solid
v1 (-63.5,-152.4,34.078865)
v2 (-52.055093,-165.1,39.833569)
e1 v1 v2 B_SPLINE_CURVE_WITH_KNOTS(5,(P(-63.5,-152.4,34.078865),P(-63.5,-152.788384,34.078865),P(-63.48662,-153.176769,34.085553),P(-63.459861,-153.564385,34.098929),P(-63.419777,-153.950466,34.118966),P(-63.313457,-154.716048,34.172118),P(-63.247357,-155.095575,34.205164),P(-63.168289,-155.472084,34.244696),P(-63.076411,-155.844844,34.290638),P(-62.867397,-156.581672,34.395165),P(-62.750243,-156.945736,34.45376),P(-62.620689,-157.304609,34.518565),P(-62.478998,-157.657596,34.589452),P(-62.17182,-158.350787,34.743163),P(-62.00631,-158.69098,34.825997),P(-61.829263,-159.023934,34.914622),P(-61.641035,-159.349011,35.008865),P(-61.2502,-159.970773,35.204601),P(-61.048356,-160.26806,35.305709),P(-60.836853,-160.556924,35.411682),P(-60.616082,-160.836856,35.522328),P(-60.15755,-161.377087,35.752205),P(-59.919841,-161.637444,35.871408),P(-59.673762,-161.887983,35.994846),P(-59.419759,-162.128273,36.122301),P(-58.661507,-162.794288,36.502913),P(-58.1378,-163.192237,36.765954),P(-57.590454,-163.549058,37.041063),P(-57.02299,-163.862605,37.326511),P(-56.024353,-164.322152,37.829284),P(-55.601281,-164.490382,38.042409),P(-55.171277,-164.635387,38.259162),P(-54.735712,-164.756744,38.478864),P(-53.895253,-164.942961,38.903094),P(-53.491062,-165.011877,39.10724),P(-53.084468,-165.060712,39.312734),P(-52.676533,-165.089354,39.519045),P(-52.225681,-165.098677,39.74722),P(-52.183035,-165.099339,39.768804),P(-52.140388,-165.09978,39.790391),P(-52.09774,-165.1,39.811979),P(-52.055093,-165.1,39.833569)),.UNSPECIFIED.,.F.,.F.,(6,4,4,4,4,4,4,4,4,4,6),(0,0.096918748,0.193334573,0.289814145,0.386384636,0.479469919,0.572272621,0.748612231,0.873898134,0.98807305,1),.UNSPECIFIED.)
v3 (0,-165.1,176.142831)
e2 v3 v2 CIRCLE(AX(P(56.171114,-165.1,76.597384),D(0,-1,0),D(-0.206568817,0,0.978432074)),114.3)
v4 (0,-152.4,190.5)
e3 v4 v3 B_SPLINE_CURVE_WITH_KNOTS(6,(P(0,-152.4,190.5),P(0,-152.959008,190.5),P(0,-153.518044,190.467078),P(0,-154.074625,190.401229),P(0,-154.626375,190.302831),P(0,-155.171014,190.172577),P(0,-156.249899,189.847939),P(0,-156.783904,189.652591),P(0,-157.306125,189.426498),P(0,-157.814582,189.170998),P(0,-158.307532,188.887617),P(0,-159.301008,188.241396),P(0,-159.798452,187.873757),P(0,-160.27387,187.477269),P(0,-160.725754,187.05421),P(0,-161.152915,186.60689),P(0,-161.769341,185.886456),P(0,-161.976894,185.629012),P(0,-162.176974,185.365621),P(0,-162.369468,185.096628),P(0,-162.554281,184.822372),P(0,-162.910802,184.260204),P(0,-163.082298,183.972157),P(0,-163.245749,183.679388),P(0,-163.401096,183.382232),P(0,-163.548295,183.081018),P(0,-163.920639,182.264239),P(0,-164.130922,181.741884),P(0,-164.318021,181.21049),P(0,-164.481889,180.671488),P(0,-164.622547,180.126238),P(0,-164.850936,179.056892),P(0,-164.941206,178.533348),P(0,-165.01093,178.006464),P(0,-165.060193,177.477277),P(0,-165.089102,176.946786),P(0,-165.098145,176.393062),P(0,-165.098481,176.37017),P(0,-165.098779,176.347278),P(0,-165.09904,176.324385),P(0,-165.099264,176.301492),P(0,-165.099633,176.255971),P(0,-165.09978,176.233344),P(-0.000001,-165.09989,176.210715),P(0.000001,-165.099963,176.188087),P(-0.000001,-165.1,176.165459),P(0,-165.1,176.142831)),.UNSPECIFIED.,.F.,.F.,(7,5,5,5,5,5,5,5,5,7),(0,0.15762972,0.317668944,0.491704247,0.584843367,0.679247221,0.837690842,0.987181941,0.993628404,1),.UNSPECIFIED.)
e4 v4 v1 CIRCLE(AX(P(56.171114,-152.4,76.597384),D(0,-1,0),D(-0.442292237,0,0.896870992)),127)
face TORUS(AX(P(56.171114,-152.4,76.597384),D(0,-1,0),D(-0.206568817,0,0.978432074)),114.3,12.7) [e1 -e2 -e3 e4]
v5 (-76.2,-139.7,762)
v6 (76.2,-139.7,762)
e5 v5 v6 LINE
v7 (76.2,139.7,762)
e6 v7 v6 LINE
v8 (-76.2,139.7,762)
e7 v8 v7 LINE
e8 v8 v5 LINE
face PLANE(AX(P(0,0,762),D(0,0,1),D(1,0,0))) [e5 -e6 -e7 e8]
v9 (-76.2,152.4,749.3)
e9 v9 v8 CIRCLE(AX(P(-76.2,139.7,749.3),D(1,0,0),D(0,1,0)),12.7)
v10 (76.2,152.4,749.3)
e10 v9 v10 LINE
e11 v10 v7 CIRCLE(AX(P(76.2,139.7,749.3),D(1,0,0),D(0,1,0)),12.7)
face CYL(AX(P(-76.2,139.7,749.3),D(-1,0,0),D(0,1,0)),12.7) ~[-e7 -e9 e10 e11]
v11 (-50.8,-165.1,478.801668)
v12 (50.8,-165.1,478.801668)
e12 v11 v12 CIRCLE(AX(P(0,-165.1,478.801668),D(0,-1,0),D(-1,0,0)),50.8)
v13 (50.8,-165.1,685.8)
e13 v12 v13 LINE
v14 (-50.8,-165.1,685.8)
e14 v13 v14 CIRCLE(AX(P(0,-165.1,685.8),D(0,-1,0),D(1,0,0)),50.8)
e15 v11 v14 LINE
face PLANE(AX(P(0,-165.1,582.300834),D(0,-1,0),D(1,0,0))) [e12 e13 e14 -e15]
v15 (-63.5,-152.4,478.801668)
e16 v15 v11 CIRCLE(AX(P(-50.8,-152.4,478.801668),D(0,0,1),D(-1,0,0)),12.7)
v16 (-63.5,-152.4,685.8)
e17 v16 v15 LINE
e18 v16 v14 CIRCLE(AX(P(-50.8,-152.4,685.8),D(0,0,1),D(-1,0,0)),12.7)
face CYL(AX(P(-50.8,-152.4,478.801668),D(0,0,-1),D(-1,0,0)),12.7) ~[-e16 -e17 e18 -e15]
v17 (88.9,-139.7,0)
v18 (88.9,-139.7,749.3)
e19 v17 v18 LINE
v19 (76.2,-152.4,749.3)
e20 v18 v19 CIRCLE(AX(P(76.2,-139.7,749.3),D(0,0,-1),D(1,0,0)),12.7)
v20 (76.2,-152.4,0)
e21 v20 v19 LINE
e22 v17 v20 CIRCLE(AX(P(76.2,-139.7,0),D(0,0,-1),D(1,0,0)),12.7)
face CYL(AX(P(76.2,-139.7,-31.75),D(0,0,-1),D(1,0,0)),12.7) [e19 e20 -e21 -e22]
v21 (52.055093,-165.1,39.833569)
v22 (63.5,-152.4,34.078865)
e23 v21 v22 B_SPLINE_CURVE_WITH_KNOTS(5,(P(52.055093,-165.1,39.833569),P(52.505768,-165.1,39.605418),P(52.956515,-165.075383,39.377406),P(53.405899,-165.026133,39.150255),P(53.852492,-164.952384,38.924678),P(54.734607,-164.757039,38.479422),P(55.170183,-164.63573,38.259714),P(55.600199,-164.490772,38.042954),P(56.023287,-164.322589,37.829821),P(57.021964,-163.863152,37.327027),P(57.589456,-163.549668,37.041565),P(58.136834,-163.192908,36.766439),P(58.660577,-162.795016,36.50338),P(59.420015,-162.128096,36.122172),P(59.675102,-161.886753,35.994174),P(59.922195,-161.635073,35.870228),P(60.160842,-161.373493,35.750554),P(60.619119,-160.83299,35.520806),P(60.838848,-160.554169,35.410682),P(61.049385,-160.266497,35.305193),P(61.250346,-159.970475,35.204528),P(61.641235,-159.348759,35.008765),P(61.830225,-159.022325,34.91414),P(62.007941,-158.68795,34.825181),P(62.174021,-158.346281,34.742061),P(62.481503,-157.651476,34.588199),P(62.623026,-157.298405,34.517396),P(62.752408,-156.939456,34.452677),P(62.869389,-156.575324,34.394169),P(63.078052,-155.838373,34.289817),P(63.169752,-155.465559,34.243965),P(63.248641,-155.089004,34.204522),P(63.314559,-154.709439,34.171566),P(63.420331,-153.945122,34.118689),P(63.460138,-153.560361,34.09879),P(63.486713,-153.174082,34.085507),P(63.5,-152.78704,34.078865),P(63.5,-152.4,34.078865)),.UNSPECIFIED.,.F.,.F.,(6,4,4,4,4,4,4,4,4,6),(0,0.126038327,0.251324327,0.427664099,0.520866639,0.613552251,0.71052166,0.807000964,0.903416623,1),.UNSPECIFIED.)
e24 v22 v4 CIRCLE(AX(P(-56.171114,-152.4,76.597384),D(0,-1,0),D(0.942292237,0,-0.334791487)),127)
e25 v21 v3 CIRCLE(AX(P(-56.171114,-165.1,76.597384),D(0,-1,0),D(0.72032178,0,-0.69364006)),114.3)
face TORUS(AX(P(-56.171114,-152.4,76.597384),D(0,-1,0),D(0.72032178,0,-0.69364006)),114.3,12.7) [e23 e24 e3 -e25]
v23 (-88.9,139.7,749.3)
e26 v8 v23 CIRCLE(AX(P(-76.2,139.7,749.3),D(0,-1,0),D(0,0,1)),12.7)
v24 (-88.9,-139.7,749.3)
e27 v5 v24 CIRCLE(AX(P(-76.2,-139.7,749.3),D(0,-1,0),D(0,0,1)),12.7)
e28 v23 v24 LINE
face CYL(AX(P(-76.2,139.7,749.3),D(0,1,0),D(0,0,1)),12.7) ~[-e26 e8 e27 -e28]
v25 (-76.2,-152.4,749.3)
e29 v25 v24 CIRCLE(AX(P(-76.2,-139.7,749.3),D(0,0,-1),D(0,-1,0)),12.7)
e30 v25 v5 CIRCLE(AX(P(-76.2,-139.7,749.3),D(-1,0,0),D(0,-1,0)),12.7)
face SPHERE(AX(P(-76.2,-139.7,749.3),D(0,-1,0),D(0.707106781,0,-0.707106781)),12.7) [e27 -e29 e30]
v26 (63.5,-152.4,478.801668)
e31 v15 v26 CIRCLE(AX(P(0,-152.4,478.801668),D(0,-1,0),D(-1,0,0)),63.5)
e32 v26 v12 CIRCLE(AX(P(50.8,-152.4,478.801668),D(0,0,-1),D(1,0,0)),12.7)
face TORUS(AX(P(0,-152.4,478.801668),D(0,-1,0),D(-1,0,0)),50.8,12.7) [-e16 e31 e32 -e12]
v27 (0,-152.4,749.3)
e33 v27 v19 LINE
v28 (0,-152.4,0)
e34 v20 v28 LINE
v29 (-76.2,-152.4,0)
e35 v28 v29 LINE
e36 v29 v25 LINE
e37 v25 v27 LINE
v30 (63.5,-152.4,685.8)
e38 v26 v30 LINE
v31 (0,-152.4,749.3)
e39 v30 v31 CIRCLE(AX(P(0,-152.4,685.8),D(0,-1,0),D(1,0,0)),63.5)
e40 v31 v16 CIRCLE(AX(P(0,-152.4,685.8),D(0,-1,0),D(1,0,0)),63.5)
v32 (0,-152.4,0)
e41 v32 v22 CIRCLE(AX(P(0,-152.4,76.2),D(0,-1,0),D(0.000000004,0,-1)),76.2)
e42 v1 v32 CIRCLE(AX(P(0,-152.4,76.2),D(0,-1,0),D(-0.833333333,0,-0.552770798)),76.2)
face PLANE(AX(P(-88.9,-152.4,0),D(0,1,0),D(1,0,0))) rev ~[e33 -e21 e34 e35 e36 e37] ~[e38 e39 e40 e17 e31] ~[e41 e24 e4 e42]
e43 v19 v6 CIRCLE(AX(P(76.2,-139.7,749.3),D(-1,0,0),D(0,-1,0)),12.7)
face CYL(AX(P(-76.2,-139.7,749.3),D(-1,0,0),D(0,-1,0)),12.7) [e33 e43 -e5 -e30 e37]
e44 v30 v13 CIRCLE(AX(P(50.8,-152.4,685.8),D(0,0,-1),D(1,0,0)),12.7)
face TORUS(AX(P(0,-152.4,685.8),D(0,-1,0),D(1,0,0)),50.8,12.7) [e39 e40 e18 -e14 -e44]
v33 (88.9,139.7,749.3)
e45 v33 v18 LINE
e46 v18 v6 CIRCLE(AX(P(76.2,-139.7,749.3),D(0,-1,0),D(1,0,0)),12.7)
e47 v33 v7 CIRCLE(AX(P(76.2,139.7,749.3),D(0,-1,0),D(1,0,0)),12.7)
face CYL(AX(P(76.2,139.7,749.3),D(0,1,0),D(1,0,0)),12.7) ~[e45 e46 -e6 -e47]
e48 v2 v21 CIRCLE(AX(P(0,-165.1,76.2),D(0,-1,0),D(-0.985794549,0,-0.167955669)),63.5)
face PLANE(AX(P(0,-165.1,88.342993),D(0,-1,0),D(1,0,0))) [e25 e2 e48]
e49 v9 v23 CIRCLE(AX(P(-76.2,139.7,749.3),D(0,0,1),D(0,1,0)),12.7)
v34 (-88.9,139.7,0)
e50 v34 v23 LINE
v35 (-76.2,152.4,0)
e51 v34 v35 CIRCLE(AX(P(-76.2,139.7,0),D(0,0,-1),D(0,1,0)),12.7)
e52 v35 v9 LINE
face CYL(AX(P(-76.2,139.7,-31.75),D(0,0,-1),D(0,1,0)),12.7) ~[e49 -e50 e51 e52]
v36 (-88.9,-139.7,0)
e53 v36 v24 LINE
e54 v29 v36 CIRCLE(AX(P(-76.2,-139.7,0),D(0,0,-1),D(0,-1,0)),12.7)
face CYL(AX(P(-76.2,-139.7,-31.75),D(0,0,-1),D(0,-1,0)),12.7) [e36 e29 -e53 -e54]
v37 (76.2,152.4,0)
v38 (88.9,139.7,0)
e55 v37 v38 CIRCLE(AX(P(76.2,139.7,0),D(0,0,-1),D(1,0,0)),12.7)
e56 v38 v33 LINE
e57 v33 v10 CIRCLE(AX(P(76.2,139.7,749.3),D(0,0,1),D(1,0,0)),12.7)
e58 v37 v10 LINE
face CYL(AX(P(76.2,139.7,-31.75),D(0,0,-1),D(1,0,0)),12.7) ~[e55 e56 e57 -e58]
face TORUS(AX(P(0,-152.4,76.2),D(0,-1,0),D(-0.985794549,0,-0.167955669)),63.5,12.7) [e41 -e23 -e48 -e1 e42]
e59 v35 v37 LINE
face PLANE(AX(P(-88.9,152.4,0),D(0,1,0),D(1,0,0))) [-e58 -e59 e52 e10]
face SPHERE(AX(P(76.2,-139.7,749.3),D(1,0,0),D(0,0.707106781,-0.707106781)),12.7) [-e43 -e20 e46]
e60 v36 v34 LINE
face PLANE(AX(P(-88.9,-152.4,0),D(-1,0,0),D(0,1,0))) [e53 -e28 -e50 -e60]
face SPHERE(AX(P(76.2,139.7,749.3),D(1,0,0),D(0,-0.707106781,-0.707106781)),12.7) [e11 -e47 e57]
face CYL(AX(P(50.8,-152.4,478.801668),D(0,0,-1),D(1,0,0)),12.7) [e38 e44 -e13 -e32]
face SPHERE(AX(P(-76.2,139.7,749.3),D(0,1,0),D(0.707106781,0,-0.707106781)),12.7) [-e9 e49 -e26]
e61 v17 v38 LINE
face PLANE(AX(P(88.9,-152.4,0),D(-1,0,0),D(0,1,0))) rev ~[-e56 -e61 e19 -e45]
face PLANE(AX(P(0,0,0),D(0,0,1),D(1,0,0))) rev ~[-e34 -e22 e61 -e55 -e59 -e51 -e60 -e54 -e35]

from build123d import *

# Parameters (mm, degrees)
F0_W         = 177.8
F0_H         = 304.8
F1_DEPTH     = 762
F3_DEPTH     = 12.7
F5_T1_DEPTH  = 279.4
F5_T3_DEPTH  = 152.4
F5_T5_DEPTH  = 781.05
F5_T7_DEPTH  = 206.9983323097
F5_S11_W     = 12.954
F5_S11_H     = 12.954
F5_T12_DEPTH = 12.954
F5_S17_W     = 12.954
F5_S17_H     = 12.954
F5_T18_DEPTH = 12.954
F5_S23_W     = 12.954
F5_S23_H     = 12.954
F5_T24_DEPTH = 12.954
F5_S29_W     = 12.954
F5_S29_H     = 12.954
F5_T30_DEPTH = 12.954
F5_T34_ANGLE = 180
F5_T36_ANGLE = 180
F5_T38_ANGLE = 160.6620429302
F5_T40_ANGLE = 121.9975948725
F5_T42_ANGLE = 121.9975948725


# Not quite as in the source:
# - a fillet or chamfer that OpenCascade refuses, or shapes differently, is made with other operations: its cross-section is extruded or revolved along the edge and cut away or added
# - a feature of the source that left no trace in its solid (it failed there, or was rolled back) is left out


with BuildPart() as f1:
    # F0 (on Top) → F1 (new body)
    with BuildSketch(Plane.XY):
        Rectangle(F0_W, F0_H)
    extrude(amount=F1_DEPTH)

    # F2 (on face) → F3 (join)
    with BuildSketch(Plane.XZ.offset(152.4)):
        with BuildLine():
            ThreePointArc((0, 190.5), (-61.5022268, 124.3675088832), (-63.5, 34.0788651625))
            ThreePointArc((-63.5, 34.0788651625), (-36.0333838653, 9.0580961901), (3.12e-07, 0))
            ThreePointArc((3.12e-07, 0), (36.0333841402, 9.0580963377), (63.5, 34.0788651625))
            ThreePointArc((63.5, 34.0788651625), (61.5022268, 124.3675088832), (0, 190.5))
        make_face()
        with BuildLine():
            ThreePointArc((63.5, 685.8), (0, 749.3), (-63.5, 685.8))
            Line((-63.5, 685.8), (-63.5, 478.8016676903))
            ThreePointArc((-63.5, 478.8016676903), (0, 415.3016676903), (63.5, 478.8016676903))
            Line((63.5, 478.8016676903), (63.5, 685.8))
        make_face()
    extrude(amount=F3_DEPTH)

    # F5: fillet of radius 12.7 on 15 edges, made by hand

    # F5_s2 → F5_t1 (cut)
    with BuildSketch(Plane.XZ.offset(-139.7)):
        with BuildLine():
            ThreePointArc((88.9, 749.3), (85.1802561211, 758.2802561211), (76.2, 762))
            Line((76.2, 762), (88.9, 762))
            Line((88.9, 762), (88.9, 749.3))
        make_face()
        with BuildLine():
            ThreePointArc((-76.2, 762), (-85.1802561211, 758.2802561211), (-88.9, 749.3))
            Line((-88.9, 749.3), (-88.9, 762))
            Line((-88.9, 762), (-76.2, 762))
        make_face()
    extrude(amount=F5_T1_DEPTH, mode=Mode.SUBTRACT)

    # F5_s4 → F5_t3 (cut)
    with BuildSketch(Plane.YZ.offset(-76.2)):
        with BuildLine():
            ThreePointArc((152.4, 749.3), (148.6802561211, 758.2802561211), (139.7, 762))
            Line((139.7, 762), (152.4, 762))
            Line((152.4, 762), (152.4, 749.3))
        make_face()
        with BuildLine():
            ThreePointArc((-152.4, 749.3), (-148.6802561211, 758.2802561211), (-139.7, 762))
            Line((-139.7, 762), (-152.4, 762))
            Line((-152.4, 762), (-152.4, 749.3))
        make_face()
    extrude(amount=F5_T3_DEPTH, mode=Mode.SUBTRACT)

    # F5_s6 → F5_t5 (cut)
    with BuildSketch(Plane.XY.offset(-31.75)):
        with BuildLine():
            ThreePointArc((-76.2, -152.4), (-85.1802561211, -148.6802561211), (-88.9, -139.7))
            Line((-88.9, -139.7), (-88.9, -152.4))
            Line((-88.9, -152.4), (-76.2, -152.4))
        make_face()
        with BuildLine():
            ThreePointArc((-76.2, 152.4), (-85.1802561211, 148.6802561211), (-88.9, 139.7))
            Line((-88.9, 139.7), (-88.9, 152.4))
            Line((-88.9, 152.4), (-76.2, 152.4))
        make_face()
        with BuildLine():
            ThreePointArc((88.9, -139.7), (85.1802561211, -148.6802561211), (76.2, -152.4))
            Line((76.2, -152.4), (88.9, -152.4))
            Line((88.9, -152.4), (88.9, -139.7))
        make_face()
        with BuildLine():
            ThreePointArc((88.9, 139.7), (85.1802561211, 148.6802561211), (76.2, 152.4))
            Line((76.2, 152.4), (88.9, 152.4))
            Line((88.9, 152.4), (88.9, 139.7))
        make_face()
    extrude(amount=F5_T5_DEPTH, mode=Mode.SUBTRACT)

    # F5_s8 → F5_t7 (cut)
    with BuildSketch(Plane.XY.offset(478.8016676903)):
        with BuildLine():
            ThreePointArc((63.5, -152.4), (59.7802561211, -161.3802561211), (50.8, -165.1))
            Line((50.8, -165.1), (63.5, -165.1))
            Line((63.5, -165.1), (63.5, -152.4))
        make_face()
        with BuildLine():
            ThreePointArc((-63.5, -152.4), (-59.7802561211, -161.3802561211), (-50.8, -165.1))
            Line((-50.8, -165.1), (-63.5, -165.1))
            Line((-63.5, -165.1), (-63.5, -152.4))
        make_face()
    extrude(amount=F5_T7_DEPTH, mode=Mode.SUBTRACT)


with BuildPart() as f5_tool10:
    # F5_s11 → F5_t12 (new body)
    with BuildSketch(Plane.YZ.offset(76.2)):
        with Locations((-146.177, 755.777)):
            Rectangle(F5_S11_W, F5_S11_H)
    extrude(amount=F5_T12_DEPTH)

    # F5_s13 → F5_t14 (revolve, cut)
    with BuildSketch(Plane(origin=(76.2, -139.7, 749.3), x_dir=(0, 0.7071067812, -0.7071067812), z_dir=(0, -0.7071067812, -0.7071067812))):
        with BuildLine():
            ThreePointArc((0, -12.7), (12.7, 0), (0, 12.7))
            Line((0, 12.7), (0, -12.7))
        make_face()
    revolve(axis=Axis((76.2, -139.7, 749.3), (1, 0, 0)), mode=Mode.SUBTRACT)


with BuildPart() as f1_1:
    add(f1.part)

    # F5_t9: cut F5_tool10
    add(f5_tool10.part, mode=Mode.SUBTRACT)


with BuildPart() as f5_tool16:
    # F5_s17 → F5_t18 (new body)
    with BuildSketch(Plane.YZ.offset(76.2)):
        with Locations((146.177, 755.777)):
            Rectangle(F5_S17_W, F5_S17_H)
    extrude(amount=F5_T18_DEPTH)

    # F5_s19 → F5_t20 (revolve, cut)
    with BuildSketch(Plane(origin=(76.2, 139.7, 749.3), x_dir=(0, -0.7071067812, -0.7071067812), z_dir=(0, -0.7071067812, 0.7071067812))):
        with BuildLine():
            ThreePointArc((0, -12.7), (12.7, 0), (0, 12.7))
            Line((0, 12.7), (0, -12.7))
        make_face()
    revolve(axis=Axis((76.2, 139.7, 749.3), (1, 0, 0)), mode=Mode.SUBTRACT)


with BuildPart() as f1_2:
    add(f1_1.part)

    # F5_t15: cut F5_tool16
    add(f5_tool16.part, mode=Mode.SUBTRACT)


with BuildPart() as f5_tool22:
    # F5_s23 → F5_t24 (new body)
    with BuildSketch(Plane.XZ.offset(-139.7)):
        with Locations((-82.677, 755.777)):
            Rectangle(F5_S23_W, F5_S23_H)
    extrude(amount=-F5_T24_DEPTH)

    # F5_s25 → F5_t26 (revolve, cut)
    with BuildSketch(Plane(origin=(-76.2, 139.7, 749.3), x_dir=(0.7071067812, 0, -0.7071067812), z_dir=(0.7071067812, 0, 0.7071067812))):
        with BuildLine():
            ThreePointArc((0, -12.7), (12.7, 0), (0, 12.7))
            Line((0, 12.7), (0, -12.7))
        make_face()
    revolve(axis=Axis((-76.2, 139.7, 749.3), (0, 1, 0)), mode=Mode.SUBTRACT)


with BuildPart() as f1_3:
    add(f1_2.part)

    # F5_t21: cut F5_tool22
    add(f5_tool22.part, mode=Mode.SUBTRACT)


with BuildPart() as f5_tool28:
    # F5_s29 → F5_t30 (new body)
    with BuildSketch(Plane.XZ.offset(139.7)):
        with Locations((-82.677, 755.777)):
            Rectangle(F5_S29_W, F5_S29_H)
    extrude(amount=F5_T30_DEPTH)

    # F5_s31 → F5_t32 (revolve, cut)
    with BuildSketch(Plane(origin=(-76.2, -139.7, 749.3), x_dir=(0.7071067812, 0, -0.7071067812), z_dir=(-0.7071067812, 0, -0.7071067812))):
        with BuildLine():
            ThreePointArc((0, -12.7), (12.7, 0), (0, 12.7))
            Line((0, 12.7), (0, -12.7))
        make_face()
    revolve(axis=Axis((-76.2, -139.7, 749.3), (0, -1, 0)), mode=Mode.SUBTRACT)


with BuildPart() as f1_4:
    add(f1_3.part)

    # F5_t27: cut F5_tool28
    add(f5_tool28.part, mode=Mode.SUBTRACT)

    # F5_s33 → F5_t34 (revolve, cut)
    with BuildSketch(Plane.XY.offset(478.8016676903)):
        with BuildLine():
            ThreePointArc((-63.5, -152.4), (-59.7802561211, -161.3802561211), (-50.8, -165.1))
            Line((-50.8, -165.1), (-63.5, -165.1))
            Line((-63.5, -165.1), (-63.5, -152.4))
        make_face()
    revolve(axis=Axis((0, -165.1, 478.8016676903), (0, -1, 0)), revolution_arc=F5_T34_ANGLE, mode=Mode.SUBTRACT)

    # F5_s35 → F5_t36 (revolve, cut)
    with BuildSketch(Plane.XY.offset(685.8)):
        with BuildLine():
            ThreePointArc((63.5, -152.4), (59.7802561211, -161.3802561211), (50.8, -165.1))
            Line((50.8, -165.1), (63.5, -165.1))
            Line((63.5, -165.1), (63.5, -152.4))
        make_face()
    revolve(axis=Axis((0, -165.1, 685.8), (0, -1, 0)), revolution_arc=F5_T36_ANGLE, mode=Mode.SUBTRACT)

    # F5_s37 → F5_t38 (revolve, cut)
    with BuildSketch(Plane(origin=(-12.6164174444, 0, 74.050466073), x_dir=(0, 1, 0), z_dir=(-0.1679556687, 0, 0.9857945493))):
        with BuildLine():
            ThreePointArc((-152.4, 63.401778044), (-161.3802561211, 59.6820341651), (-165.1, 50.701778044))
            Line((-165.1, 50.701778044), (-165.1, 63.401778044))
            Line((-165.1, 63.401778044), (-152.4, 63.401778044))
        make_face()
    revolve(axis=Axis((0, -165.1, 76.2), (0, -1, 0)), revolution_arc=F5_T38_ANGLE, mode=Mode.SUBTRACT)

    # F5_s39 → F5_t40 (revolve, cut)
    with BuildSketch(Plane(origin=(69.2556243915, 0, 14.6214058217), x_dir=(0, 1, 0), z_dir=(0.9784320741, 0, 0.2065688173))):
        with BuildLine():
            ThreePointArc((-152.4, 190.3421366621), (-161.3802561211, 186.6223927832), (-165.1, 177.6421366621))
            Line((-165.1, 177.6421366621), (-165.1, 190.3421366621))
            Line((-165.1, 190.3421366621), (-152.4, 190.3421366621))
        make_face()
    revolve(axis=Axis((56.1711141332, -165.1, 76.5973839763), (0, -1, 0)), revolution_arc=F5_T40_ANGLE, mode=Mode.SUBTRACT)

    # F5_s41 → F5_t42 (revolve, cut)
    with BuildSketch(Plane(origin=(11.2454514703, 0, 11.6780216132), x_dir=(0, 1, 0), z_dir=(-0.6936400605, 0, -0.7203217798))):
        with BuildLine():
            ThreePointArc((-152.4, 33.4077090386), (-161.3802561211, 29.6879651596), (-165.1, 20.7077090386))
            Line((-165.1, 20.7077090386), (-165.1, 33.4077090386))
            Line((-165.1, 33.4077090386), (-152.4, 33.4077090386))
        make_face()
    revolve(axis=Axis((-56.1711141332, -165.1, 76.5973839763), (0, -1, 0)), revolution_arc=F5_T42_ANGLE, mode=Mode.SUBTRACT)


solid = f1_4.part
